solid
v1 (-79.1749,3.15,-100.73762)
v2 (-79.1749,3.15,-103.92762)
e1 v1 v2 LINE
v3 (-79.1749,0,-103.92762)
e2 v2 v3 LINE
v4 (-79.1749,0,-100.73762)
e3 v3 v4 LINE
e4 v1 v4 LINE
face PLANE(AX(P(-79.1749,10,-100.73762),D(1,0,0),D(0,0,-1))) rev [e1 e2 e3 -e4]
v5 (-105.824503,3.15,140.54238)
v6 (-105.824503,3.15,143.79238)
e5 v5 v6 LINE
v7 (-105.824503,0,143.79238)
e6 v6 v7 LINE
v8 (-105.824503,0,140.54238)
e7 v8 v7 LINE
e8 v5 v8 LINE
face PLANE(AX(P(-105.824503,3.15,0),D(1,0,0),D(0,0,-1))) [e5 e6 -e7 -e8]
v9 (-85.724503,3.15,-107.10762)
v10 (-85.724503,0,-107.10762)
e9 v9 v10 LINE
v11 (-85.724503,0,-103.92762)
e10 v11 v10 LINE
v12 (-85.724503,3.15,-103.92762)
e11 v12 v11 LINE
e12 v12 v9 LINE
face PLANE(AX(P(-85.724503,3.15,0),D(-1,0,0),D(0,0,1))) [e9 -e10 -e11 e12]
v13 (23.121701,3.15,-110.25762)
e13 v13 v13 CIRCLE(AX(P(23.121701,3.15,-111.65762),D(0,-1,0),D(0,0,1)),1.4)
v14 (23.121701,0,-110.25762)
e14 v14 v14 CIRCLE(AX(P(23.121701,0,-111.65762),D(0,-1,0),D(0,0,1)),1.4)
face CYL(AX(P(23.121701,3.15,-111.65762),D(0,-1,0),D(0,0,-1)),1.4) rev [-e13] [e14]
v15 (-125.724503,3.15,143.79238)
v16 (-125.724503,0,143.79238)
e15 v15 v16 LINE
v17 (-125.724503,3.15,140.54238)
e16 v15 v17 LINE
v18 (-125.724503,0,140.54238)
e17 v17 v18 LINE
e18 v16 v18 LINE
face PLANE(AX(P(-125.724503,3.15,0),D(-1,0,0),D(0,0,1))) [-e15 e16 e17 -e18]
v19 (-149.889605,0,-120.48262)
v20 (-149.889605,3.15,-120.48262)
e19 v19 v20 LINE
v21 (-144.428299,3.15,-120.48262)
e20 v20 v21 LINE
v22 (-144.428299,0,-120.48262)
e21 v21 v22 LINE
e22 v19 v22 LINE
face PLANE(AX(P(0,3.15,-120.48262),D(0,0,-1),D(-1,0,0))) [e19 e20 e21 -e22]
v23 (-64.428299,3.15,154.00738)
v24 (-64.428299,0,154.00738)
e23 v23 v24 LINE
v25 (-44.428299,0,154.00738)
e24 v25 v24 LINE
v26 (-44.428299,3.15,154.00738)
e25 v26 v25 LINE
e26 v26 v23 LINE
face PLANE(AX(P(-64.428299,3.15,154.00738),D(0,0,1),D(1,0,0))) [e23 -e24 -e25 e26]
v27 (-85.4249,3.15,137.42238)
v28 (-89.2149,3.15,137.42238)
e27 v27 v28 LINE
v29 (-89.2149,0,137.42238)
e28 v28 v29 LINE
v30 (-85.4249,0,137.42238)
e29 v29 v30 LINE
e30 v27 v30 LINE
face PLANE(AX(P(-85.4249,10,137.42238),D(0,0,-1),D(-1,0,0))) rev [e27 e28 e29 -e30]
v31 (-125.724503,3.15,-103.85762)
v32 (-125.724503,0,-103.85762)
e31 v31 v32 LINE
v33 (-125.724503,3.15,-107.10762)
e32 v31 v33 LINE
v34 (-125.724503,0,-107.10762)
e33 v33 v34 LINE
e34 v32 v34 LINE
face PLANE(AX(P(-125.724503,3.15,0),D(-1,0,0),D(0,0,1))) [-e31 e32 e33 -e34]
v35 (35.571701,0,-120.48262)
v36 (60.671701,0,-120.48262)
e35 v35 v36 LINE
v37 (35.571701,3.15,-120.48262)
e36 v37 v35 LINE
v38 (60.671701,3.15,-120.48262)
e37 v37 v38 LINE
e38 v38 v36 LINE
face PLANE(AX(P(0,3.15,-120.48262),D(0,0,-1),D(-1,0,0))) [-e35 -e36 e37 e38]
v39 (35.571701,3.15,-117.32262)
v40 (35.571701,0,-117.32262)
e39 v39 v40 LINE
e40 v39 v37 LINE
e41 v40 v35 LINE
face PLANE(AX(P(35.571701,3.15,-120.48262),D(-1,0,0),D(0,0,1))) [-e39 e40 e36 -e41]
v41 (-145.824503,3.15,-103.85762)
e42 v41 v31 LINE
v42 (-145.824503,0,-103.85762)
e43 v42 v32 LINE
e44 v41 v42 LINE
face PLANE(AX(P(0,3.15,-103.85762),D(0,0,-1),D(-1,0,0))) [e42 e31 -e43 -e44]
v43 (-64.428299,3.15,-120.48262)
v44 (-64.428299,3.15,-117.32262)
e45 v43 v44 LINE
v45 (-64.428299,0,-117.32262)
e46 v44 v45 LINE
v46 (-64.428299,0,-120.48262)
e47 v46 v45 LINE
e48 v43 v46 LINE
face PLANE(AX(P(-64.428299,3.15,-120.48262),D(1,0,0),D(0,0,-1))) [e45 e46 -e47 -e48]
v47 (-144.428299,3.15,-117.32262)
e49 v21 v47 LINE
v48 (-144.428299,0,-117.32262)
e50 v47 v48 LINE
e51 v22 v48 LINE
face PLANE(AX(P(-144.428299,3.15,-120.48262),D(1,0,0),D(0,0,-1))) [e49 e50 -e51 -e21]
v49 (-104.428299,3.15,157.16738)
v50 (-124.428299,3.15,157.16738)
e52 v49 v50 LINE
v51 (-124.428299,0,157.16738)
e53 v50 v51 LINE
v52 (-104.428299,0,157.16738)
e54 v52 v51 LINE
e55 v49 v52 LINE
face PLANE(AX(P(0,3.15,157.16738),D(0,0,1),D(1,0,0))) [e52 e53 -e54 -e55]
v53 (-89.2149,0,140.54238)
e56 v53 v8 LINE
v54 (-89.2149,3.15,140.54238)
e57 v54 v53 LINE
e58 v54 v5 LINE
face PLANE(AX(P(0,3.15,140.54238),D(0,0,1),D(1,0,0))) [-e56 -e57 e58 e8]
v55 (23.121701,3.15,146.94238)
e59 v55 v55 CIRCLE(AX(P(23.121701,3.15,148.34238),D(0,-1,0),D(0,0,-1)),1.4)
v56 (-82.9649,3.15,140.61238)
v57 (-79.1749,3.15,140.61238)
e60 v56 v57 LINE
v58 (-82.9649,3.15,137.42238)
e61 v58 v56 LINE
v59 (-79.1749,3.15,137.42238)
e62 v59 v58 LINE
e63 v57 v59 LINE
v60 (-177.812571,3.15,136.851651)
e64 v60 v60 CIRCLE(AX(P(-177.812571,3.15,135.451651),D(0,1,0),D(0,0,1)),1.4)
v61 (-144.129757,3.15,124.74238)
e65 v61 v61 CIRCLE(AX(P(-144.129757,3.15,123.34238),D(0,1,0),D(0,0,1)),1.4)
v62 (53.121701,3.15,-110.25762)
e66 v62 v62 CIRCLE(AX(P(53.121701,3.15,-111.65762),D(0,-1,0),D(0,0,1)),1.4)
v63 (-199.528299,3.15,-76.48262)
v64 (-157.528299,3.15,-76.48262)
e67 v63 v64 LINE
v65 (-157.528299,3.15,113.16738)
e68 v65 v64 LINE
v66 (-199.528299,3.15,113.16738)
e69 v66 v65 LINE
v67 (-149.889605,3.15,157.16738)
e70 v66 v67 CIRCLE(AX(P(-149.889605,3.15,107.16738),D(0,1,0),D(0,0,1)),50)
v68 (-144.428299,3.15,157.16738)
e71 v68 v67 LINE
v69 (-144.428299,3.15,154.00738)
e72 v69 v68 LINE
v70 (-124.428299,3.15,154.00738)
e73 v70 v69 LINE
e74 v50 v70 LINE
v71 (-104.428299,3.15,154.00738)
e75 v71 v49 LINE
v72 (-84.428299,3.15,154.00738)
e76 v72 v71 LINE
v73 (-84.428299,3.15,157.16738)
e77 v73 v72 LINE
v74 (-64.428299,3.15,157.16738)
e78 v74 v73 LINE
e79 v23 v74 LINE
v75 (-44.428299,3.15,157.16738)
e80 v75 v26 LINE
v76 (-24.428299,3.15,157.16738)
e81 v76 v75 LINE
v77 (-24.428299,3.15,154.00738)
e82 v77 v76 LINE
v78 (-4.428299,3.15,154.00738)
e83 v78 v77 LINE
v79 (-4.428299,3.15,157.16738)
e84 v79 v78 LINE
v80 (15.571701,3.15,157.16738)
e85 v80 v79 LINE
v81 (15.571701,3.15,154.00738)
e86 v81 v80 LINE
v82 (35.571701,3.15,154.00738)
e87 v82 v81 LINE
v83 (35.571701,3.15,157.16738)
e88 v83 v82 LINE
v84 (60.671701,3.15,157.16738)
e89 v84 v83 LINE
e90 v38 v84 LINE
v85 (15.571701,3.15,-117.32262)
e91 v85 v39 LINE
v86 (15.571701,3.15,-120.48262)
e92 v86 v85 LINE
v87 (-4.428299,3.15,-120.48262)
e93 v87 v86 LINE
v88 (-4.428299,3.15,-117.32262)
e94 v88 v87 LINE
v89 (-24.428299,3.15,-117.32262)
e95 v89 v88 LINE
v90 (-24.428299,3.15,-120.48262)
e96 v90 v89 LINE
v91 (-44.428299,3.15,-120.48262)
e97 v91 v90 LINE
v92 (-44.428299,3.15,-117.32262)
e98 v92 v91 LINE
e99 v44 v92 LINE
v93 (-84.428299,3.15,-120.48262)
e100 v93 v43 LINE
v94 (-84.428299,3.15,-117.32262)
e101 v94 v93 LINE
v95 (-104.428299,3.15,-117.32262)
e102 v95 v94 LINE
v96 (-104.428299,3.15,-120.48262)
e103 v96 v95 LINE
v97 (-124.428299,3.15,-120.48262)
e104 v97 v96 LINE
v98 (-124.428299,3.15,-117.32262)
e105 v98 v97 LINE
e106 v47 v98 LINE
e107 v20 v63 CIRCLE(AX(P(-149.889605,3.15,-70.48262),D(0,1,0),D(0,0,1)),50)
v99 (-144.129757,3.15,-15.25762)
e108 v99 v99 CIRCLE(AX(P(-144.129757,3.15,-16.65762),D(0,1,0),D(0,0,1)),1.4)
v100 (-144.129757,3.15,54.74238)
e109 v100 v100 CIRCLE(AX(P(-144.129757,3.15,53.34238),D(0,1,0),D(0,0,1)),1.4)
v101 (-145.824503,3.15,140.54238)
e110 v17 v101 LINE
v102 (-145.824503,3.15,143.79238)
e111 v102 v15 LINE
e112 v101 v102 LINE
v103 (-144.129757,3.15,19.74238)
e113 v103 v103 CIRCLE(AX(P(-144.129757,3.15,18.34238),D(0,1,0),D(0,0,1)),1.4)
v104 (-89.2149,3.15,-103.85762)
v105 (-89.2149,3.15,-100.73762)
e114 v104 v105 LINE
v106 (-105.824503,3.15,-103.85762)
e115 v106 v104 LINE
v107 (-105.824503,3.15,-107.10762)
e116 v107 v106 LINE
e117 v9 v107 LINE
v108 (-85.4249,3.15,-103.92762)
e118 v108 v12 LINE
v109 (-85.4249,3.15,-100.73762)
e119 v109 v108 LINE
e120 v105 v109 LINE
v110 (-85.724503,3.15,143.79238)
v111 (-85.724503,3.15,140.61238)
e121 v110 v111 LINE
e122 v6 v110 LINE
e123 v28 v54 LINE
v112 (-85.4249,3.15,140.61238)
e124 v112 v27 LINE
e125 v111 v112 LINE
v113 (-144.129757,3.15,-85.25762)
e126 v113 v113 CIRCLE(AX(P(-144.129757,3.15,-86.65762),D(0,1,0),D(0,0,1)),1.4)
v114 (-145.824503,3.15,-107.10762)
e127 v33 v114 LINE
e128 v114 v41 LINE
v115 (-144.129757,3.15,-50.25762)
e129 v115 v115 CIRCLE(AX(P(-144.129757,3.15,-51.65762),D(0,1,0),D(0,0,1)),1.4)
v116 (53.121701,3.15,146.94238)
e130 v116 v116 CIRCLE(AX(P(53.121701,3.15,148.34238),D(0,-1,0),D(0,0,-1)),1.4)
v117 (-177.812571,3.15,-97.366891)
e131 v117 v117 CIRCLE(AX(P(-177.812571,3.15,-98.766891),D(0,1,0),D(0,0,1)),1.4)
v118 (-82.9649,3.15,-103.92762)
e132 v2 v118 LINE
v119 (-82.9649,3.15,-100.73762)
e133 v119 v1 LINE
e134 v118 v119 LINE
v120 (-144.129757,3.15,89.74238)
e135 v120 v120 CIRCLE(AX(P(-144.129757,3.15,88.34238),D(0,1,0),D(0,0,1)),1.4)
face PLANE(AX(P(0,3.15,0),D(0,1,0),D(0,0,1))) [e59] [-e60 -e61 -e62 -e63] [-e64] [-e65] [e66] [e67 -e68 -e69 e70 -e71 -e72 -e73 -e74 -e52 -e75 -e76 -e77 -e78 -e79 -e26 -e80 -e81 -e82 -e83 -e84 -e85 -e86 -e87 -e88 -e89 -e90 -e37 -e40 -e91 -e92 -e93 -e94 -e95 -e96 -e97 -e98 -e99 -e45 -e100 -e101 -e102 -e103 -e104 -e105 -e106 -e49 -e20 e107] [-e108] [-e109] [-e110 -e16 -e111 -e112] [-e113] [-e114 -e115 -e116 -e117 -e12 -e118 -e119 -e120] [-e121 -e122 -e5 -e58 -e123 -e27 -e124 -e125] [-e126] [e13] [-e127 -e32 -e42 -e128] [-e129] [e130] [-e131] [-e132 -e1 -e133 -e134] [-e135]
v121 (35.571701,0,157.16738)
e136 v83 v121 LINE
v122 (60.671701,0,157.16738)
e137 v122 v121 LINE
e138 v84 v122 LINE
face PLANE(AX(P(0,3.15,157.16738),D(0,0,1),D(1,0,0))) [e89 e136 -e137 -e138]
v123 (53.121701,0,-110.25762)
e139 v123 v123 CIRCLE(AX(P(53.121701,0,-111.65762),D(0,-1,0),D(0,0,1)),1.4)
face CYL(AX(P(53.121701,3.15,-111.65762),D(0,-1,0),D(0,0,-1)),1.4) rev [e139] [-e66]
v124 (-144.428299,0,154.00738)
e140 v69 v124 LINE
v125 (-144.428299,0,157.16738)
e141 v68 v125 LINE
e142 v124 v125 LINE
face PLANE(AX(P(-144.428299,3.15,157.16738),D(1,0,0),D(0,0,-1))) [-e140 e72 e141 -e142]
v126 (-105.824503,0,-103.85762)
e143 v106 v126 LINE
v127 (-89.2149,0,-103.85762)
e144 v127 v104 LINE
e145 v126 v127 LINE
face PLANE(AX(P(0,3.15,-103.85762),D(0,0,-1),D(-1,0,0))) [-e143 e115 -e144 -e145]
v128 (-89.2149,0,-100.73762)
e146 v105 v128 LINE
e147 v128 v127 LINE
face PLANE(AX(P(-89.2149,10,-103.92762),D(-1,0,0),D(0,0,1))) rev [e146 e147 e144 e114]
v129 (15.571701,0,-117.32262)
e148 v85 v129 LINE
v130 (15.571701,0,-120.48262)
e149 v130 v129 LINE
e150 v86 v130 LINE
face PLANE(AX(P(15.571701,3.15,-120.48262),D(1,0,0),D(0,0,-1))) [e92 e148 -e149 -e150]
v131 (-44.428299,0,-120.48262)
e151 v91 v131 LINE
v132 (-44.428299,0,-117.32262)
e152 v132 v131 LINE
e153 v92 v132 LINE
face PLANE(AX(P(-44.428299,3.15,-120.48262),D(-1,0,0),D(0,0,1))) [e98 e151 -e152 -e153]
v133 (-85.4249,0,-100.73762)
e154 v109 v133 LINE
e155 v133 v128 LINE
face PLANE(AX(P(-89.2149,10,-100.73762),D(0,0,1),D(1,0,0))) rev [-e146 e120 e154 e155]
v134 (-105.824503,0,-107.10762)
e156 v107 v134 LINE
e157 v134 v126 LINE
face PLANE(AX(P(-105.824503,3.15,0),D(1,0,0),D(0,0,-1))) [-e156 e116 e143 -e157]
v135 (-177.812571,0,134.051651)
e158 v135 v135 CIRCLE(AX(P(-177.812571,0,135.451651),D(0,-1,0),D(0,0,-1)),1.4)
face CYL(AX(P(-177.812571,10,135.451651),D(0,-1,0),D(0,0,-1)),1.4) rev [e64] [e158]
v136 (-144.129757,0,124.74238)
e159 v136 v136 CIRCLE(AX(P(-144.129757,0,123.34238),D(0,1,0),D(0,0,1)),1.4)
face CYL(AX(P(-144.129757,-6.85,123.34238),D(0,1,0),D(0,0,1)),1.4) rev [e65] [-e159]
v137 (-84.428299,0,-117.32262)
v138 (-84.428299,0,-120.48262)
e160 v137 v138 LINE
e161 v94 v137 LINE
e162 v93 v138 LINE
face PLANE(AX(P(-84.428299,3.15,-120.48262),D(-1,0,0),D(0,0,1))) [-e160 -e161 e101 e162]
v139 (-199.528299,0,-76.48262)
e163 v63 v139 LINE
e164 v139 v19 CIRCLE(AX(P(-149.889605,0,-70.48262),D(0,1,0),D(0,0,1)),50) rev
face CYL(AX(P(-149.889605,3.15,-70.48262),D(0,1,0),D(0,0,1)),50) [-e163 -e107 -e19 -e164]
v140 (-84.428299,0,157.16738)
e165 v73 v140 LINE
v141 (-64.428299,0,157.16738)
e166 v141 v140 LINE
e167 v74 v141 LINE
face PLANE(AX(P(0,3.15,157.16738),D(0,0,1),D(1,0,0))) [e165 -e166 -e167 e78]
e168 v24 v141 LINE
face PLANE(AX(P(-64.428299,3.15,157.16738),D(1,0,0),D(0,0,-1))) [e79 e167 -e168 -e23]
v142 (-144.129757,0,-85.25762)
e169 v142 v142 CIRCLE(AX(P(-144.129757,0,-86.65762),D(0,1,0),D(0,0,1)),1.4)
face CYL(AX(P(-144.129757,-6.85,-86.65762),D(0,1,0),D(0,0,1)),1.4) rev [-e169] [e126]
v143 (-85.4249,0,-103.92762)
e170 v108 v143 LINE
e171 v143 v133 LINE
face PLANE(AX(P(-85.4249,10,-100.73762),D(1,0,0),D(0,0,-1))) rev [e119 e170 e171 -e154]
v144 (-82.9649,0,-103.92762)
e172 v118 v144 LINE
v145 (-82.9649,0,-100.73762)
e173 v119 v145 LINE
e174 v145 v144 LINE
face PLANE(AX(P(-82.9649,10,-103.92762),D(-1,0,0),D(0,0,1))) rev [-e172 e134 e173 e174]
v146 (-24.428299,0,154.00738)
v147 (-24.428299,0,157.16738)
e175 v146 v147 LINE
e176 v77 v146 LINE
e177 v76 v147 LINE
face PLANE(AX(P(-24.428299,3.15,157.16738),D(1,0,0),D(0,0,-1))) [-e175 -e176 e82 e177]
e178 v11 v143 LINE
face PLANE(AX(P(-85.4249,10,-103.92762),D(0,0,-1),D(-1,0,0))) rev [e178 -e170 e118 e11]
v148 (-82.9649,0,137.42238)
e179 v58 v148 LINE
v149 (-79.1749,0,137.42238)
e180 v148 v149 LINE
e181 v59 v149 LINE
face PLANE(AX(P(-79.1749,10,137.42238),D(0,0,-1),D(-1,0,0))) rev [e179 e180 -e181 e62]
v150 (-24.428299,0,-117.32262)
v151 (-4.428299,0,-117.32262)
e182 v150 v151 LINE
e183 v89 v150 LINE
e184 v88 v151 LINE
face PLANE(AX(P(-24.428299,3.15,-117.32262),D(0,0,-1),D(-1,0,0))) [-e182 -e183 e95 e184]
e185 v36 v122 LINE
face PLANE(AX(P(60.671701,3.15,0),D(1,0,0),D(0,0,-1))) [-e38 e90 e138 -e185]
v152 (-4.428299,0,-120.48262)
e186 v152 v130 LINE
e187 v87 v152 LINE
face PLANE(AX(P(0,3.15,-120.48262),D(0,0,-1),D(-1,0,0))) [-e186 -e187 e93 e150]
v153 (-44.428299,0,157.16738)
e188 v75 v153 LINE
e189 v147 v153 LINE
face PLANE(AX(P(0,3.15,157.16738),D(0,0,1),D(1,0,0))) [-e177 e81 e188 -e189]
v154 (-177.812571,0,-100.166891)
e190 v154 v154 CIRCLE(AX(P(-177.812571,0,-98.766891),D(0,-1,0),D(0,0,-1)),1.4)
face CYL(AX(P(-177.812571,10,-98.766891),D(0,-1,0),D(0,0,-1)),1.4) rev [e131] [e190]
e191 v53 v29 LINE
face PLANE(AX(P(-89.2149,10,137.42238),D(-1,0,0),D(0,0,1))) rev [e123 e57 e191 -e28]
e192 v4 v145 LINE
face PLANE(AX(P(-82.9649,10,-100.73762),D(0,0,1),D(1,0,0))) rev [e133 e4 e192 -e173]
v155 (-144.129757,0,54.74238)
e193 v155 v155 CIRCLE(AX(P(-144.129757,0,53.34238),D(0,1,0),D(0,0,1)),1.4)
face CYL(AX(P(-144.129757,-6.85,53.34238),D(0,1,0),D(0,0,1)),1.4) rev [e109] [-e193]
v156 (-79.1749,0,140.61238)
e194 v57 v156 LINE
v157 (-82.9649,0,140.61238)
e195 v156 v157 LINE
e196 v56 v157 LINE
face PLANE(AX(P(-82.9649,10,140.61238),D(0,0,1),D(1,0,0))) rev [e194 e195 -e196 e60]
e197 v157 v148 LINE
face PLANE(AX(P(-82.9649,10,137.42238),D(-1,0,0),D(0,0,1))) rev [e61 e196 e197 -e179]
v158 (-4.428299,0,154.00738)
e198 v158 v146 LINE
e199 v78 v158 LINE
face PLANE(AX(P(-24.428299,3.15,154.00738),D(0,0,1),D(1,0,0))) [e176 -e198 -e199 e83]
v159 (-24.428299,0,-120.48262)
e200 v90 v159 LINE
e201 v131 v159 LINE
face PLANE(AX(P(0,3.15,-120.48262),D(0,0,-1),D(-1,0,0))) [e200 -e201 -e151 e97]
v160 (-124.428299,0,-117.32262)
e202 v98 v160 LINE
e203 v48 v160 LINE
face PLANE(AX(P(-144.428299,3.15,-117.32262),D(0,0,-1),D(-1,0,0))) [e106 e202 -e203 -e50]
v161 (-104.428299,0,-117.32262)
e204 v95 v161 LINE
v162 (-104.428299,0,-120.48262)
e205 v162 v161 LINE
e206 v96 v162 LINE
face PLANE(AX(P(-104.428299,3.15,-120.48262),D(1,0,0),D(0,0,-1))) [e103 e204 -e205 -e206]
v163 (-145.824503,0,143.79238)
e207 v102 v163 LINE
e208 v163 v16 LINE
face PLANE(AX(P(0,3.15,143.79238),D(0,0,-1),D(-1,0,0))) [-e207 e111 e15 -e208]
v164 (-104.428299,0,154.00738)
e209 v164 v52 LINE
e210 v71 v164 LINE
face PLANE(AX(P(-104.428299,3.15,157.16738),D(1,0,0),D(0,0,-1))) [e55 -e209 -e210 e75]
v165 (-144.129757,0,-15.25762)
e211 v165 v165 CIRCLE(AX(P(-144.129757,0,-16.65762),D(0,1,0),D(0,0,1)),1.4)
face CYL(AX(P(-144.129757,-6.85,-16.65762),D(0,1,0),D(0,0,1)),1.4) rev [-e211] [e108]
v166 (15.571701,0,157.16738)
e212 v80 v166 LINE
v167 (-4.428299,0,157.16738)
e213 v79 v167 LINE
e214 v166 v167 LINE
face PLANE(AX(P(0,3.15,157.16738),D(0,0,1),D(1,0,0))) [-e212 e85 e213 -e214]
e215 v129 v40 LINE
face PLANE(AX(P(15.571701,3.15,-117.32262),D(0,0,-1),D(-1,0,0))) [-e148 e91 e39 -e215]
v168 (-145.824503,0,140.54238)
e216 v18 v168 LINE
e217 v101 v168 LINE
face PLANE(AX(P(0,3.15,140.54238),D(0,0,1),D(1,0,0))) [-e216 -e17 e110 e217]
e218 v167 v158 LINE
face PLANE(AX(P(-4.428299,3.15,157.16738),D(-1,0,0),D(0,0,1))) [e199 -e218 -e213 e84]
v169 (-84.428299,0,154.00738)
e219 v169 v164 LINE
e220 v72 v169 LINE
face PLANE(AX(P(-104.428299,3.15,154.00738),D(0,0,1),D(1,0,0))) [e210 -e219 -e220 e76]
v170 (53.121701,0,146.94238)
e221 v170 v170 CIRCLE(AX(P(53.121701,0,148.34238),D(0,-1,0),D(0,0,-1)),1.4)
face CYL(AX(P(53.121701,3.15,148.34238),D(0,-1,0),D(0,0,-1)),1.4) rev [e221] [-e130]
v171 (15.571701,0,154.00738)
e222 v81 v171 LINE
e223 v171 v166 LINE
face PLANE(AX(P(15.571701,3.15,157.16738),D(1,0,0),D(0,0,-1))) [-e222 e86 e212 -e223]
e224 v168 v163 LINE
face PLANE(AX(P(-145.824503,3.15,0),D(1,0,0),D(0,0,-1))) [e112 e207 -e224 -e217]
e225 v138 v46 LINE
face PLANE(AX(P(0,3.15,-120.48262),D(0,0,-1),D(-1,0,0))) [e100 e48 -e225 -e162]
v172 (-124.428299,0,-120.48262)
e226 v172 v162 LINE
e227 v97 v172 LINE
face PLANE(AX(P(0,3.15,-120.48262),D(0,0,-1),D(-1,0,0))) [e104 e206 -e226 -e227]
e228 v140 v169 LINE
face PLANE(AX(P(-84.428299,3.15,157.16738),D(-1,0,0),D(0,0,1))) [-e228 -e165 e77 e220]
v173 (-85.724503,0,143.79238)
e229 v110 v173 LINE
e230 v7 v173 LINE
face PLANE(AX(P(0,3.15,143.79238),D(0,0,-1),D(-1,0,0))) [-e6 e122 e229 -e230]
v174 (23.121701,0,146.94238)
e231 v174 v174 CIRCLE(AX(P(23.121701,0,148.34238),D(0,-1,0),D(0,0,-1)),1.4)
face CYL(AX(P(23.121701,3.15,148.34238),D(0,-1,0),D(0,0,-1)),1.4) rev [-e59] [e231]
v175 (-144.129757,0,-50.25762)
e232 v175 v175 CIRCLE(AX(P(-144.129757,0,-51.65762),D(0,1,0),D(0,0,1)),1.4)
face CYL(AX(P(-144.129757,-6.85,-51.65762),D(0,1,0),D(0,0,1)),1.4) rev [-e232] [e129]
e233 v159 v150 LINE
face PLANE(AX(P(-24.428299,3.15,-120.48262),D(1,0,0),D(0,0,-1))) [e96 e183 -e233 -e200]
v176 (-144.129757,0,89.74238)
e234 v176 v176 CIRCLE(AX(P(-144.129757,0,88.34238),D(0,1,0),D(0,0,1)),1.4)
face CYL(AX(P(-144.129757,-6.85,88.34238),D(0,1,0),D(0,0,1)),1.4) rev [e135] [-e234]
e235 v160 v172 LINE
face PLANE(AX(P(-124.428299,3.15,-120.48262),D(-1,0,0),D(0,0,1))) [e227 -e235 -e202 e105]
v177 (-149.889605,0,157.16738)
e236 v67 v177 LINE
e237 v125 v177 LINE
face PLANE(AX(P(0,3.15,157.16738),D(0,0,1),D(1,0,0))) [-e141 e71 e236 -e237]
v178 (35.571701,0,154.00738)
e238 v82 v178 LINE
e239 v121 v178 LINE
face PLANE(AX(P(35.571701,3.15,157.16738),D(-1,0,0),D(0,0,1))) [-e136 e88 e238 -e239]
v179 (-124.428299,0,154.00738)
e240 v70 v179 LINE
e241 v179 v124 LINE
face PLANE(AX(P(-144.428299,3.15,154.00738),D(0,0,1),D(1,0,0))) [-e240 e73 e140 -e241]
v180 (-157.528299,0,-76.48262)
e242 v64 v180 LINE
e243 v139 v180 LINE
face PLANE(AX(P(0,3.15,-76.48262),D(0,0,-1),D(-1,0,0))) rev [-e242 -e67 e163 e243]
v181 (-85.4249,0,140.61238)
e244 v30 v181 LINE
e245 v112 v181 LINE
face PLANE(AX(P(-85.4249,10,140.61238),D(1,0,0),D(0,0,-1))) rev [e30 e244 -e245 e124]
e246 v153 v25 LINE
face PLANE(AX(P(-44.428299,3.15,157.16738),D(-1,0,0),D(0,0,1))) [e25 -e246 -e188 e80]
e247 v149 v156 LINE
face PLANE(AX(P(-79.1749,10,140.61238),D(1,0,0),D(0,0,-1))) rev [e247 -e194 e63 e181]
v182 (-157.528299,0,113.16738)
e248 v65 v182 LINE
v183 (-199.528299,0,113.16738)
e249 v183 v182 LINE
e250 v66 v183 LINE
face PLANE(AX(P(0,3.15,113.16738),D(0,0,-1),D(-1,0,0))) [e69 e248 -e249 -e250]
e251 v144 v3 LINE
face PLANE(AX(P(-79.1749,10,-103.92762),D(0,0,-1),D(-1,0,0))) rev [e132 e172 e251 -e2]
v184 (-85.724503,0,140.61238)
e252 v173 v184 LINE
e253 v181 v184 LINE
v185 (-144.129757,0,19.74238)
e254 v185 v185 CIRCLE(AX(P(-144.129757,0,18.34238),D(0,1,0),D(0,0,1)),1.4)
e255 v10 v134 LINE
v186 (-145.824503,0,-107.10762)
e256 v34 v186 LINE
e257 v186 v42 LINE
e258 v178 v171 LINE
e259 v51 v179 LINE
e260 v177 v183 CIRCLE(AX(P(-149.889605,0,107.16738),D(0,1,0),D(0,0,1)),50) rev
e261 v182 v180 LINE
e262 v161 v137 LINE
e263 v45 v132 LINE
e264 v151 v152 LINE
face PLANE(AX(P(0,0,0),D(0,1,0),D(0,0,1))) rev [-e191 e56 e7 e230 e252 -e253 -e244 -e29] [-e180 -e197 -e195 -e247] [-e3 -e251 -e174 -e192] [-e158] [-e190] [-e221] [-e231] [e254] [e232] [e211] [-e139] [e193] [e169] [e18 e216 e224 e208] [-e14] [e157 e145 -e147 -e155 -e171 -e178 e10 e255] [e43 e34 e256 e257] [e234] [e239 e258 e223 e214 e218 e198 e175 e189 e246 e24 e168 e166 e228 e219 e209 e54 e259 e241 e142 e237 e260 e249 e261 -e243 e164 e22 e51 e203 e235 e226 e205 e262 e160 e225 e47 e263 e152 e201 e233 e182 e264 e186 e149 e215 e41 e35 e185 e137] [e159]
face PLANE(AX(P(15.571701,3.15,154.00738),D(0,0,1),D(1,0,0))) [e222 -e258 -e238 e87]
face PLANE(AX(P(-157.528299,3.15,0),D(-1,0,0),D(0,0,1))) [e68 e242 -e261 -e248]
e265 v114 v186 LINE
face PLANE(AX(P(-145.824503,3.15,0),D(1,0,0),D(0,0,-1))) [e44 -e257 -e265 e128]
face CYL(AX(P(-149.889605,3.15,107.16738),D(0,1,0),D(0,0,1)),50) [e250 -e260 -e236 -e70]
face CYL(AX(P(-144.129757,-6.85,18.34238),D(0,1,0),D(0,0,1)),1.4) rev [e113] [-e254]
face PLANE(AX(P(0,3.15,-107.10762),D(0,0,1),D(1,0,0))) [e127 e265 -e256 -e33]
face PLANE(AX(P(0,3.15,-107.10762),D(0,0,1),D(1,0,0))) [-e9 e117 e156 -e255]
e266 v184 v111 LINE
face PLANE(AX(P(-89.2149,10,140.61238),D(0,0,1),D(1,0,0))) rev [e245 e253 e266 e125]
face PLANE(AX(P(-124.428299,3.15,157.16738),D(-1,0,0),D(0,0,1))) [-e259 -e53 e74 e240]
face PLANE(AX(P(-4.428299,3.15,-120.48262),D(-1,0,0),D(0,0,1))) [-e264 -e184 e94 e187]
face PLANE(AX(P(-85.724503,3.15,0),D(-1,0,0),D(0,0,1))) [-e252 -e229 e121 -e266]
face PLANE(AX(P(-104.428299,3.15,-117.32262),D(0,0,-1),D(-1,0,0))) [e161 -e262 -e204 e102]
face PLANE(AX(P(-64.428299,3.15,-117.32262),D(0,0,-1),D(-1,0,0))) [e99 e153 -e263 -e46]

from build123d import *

# Parameters (mm, degrees)
SKETCH2_W           = 20.1
SKETCH2_H           = 3.25
BOSS_EXTRUDE1_DEPTH = 3.15
FILLET1_R           = 50
SKETCH5_W           = 20
SKETCH5_H           = 3.16
CUT_EXTRUDE2_DEPTH  = 255.013877696
SKETCH7_R           = 1.4
CUT_EXTRUDE3_DEPTH  = 255.013877696
SKETCH8_R           = 1.4
CUT_EXTRUDE4_DEPTH  = 10
SKETCH10_R          = 1.4
CUT_EXTRUDE5_DEPTH  = 10
SKETCH11_W          = 3.79
SKETCH11_H          = 3.19
CUT_EXTRUDE6_DEPTH  = 10


with BuildPart() as part:
    # Sketch2 → Boss-Extrude1 (new body)
    with BuildSketch(Plane(origin=(0, 0, 0), x_dir=(1, 0, 0), z_dir=(0, 1, 0))):
        Polygon((-199.52829939, 76.482620099), (-157.52829939, 76.482620099), (-157.52829939, -113.167379901), (-199.52829939, -113.167379901), (-199.52829939, -157.167379901), (60.67170061, -157.167379901), (60.67170061, 120.482620099), (-199.52829939, 120.482620099), align=None)
        with Locations((-95.774503115, 105.482620099)):
            Rectangle(SKETCH2_W, SKETCH2_H, mode=Mode.SUBTRACT)
        with Locations((-135.774503115, -142.167379901)):
            Rectangle(SKETCH2_W, SKETCH2_H, mode=Mode.SUBTRACT)
        with Locations((-95.774503115, -142.167379901)):
            Rectangle(SKETCH2_W, SKETCH2_H, mode=Mode.SUBTRACT)
        with Locations((-135.774503115, 105.482620099)):
            Rectangle(SKETCH2_W, SKETCH2_H, mode=Mode.SUBTRACT)
    extrude(amount=BOSS_EXTRUDE1_DEPTH)

    # Fillet1
    # the kernel refuses this fillet: 50 mm, written as the material it takes off along each edge
    with BuildSketch(Plane(origin=(-199.52829939, -124.09673646, -120.482620099), x_dir=(1, 0, 0), z_dir=(0, 1, 0))) as fillet1_piece_1:
        with BuildLine():
            CenterArc((49.638694584, -50), FILLET1_R, 90, 83.107897421)
            Line((0, -44), (-0.992773892, -43.88))
            ThreePointArc((-0.992773892, -43.88), (-1, -22), (-1, 0))
            Line((-1, 0), (0, 1))
            Line((0, 1), (49.638694584, 1))
            Line((49.638694584, 1), (49.638694584, 0))
        make_face()
    extrude(amount=251.34347292, mode=Mode.SUBTRACT)
    with BuildSketch(Plane(origin=(-199.52829939, -124.09673646, 157.167379901), x_dir=(0, 0, -1), z_dir=(0, 1, 0))) as fillet1_piece_2:
        with BuildLine():
            CenterArc((50, -49.638694584), FILLET1_R, 96.892102579, 83.107897421)
            Line((0, -49.638694584), (-1, -49.638694584))
            Line((-1, -49.638694584), (-1, 0))
            Line((-1, 0), (0, 1))
            ThreePointArc((0, 1), (22, 1), (43.88, 0.992773892))
            Line((43.88, 0.992773892), (44, 0))
        make_face()
    extrude(amount=251.34347292, mode=Mode.SUBTRACT)

    # Sketch5 → Cut-Extrude2 (cut, through all)
    with BuildSketch(Plane(origin=(0, 0, 0), x_dir=(1, 0, 0), z_dir=(0, 1, 0))):
        with Locations((-94.42829939, 118.902620099)):
            Rectangle(SKETCH5_W, SKETCH5_H)
        with Locations((-134.42829939, 118.902620099)):
            Rectangle(SKETCH5_W, SKETCH5_H)
        with Locations((-54.42829939, 118.902620099)):
            Rectangle(SKETCH5_W, SKETCH5_H)
        with Locations((-14.42829939, 118.902620099)):
            Rectangle(SKETCH5_W, SKETCH5_H)
        with Locations((25.57170061, 118.902620099)):
            Rectangle(SKETCH5_W, SKETCH5_H)
        with Locations((25.57170061, -155.587379901)):
            Rectangle(SKETCH5_W, SKETCH5_H)
        with Locations((-14.42829939, -155.587379901)):
            Rectangle(SKETCH5_W, SKETCH5_H)
        with Locations((-54.42829939, -155.587379901)):
            Rectangle(SKETCH5_W, SKETCH5_H)
        with Locations((-94.42829939, -155.587379901)):
            Rectangle(SKETCH5_W, SKETCH5_H)
        with Locations((-134.42829939, -155.587379901)):
            Rectangle(SKETCH5_W, SKETCH5_H)
    extrude(amount=CUT_EXTRUDE2_DEPTH, mode=Mode.SUBTRACT)

    # Sketch7 → Cut-Extrude3 (cut, through all)
    with BuildSketch(Plane.XZ):
        with Locations(Location((23.12170061, 148.342379901, 0), (0, 0, 270))):
            Circle(SKETCH7_R)
        with Locations(Location((53.12170061, 148.342379901, 0), (0, 0, 270))):
            Circle(SKETCH7_R)
        with Locations(Location((53.12170061, -111.657620099, 0), (0, 0, 90))):
            Circle(SKETCH7_R)
        with Locations(Location((23.12170061, -111.657620099, 0), (0, 0, 90))):
            Circle(SKETCH7_R)
    extrude(amount=-CUT_EXTRUDE3_DEPTH, mode=Mode.SUBTRACT)

    # Sketch8 → Cut-Extrude4 (cut)
    with BuildSketch(Plane.XZ):
        with Locations(Location((-177.812570637, 135.451651148, 0), (0, 0, 270))):
            Circle(SKETCH8_R)
        with Locations(Location((-177.812570637, -98.766891346, 0), (0, 0, 270))):
            Circle(SKETCH8_R)
    extrude(amount=-CUT_EXTRUDE4_DEPTH, mode=Mode.SUBTRACT)

    # Sketch10 → Cut-Extrude5 (cut)
    with BuildSketch(Plane(origin=(0, 3.15, 0), x_dir=(1, 0, 0), z_dir=(0, 1, 0))):
        with Locations(Location((-144.129756514, -123.342379901, 0), (0, 0, 270))):
            Circle(SKETCH10_R)
        with Locations(Location((-144.129756514, 86.657620099, 0), (0, 0, 270))):
            Circle(SKETCH10_R)
        with Locations(Location((-144.129756514, 51.657620099, 0), (0, 0, 270))):
            Circle(SKETCH10_R)
        with Locations(Location((-144.129756514, 16.657620099, 0), (0, 0, 270))):
            Circle(SKETCH10_R)
        with Locations(Location((-144.129756514, -18.342379901, 0), (0, 0, 270))):
            Circle(SKETCH10_R)
        with Locations(Location((-144.129756514, -53.342379901, 0), (0, 0, 270))):
            Circle(SKETCH10_R)
        with Locations(Location((-144.129756514, -88.342379901, 0), (0, 0, 270))):
            Circle(SKETCH10_R)
    extrude(amount=-CUT_EXTRUDE5_DEPTH, mode=Mode.SUBTRACT)

    # Sketch11 → Cut-Extrude6 (cut)
    with BuildSketch(Plane.XZ):
        with Locations((-87.319899774, -102.332620099)):
            Rectangle(SKETCH11_W, SKETCH11_H)
        with Locations((-81.069899774, -102.332620099)):
            Rectangle(SKETCH11_W, SKETCH11_H)
        with Locations((-87.319899774, 139.017379901)):
            Rectangle(SKETCH11_W, SKETCH11_H)
        with Locations((-81.069899774, 139.017379901)):
            Rectangle(SKETCH11_W, SKETCH11_H)
    extrude(amount=-CUT_EXTRUDE6_DEPTH, mode=Mode.SUBTRACT)


solid = part.part
